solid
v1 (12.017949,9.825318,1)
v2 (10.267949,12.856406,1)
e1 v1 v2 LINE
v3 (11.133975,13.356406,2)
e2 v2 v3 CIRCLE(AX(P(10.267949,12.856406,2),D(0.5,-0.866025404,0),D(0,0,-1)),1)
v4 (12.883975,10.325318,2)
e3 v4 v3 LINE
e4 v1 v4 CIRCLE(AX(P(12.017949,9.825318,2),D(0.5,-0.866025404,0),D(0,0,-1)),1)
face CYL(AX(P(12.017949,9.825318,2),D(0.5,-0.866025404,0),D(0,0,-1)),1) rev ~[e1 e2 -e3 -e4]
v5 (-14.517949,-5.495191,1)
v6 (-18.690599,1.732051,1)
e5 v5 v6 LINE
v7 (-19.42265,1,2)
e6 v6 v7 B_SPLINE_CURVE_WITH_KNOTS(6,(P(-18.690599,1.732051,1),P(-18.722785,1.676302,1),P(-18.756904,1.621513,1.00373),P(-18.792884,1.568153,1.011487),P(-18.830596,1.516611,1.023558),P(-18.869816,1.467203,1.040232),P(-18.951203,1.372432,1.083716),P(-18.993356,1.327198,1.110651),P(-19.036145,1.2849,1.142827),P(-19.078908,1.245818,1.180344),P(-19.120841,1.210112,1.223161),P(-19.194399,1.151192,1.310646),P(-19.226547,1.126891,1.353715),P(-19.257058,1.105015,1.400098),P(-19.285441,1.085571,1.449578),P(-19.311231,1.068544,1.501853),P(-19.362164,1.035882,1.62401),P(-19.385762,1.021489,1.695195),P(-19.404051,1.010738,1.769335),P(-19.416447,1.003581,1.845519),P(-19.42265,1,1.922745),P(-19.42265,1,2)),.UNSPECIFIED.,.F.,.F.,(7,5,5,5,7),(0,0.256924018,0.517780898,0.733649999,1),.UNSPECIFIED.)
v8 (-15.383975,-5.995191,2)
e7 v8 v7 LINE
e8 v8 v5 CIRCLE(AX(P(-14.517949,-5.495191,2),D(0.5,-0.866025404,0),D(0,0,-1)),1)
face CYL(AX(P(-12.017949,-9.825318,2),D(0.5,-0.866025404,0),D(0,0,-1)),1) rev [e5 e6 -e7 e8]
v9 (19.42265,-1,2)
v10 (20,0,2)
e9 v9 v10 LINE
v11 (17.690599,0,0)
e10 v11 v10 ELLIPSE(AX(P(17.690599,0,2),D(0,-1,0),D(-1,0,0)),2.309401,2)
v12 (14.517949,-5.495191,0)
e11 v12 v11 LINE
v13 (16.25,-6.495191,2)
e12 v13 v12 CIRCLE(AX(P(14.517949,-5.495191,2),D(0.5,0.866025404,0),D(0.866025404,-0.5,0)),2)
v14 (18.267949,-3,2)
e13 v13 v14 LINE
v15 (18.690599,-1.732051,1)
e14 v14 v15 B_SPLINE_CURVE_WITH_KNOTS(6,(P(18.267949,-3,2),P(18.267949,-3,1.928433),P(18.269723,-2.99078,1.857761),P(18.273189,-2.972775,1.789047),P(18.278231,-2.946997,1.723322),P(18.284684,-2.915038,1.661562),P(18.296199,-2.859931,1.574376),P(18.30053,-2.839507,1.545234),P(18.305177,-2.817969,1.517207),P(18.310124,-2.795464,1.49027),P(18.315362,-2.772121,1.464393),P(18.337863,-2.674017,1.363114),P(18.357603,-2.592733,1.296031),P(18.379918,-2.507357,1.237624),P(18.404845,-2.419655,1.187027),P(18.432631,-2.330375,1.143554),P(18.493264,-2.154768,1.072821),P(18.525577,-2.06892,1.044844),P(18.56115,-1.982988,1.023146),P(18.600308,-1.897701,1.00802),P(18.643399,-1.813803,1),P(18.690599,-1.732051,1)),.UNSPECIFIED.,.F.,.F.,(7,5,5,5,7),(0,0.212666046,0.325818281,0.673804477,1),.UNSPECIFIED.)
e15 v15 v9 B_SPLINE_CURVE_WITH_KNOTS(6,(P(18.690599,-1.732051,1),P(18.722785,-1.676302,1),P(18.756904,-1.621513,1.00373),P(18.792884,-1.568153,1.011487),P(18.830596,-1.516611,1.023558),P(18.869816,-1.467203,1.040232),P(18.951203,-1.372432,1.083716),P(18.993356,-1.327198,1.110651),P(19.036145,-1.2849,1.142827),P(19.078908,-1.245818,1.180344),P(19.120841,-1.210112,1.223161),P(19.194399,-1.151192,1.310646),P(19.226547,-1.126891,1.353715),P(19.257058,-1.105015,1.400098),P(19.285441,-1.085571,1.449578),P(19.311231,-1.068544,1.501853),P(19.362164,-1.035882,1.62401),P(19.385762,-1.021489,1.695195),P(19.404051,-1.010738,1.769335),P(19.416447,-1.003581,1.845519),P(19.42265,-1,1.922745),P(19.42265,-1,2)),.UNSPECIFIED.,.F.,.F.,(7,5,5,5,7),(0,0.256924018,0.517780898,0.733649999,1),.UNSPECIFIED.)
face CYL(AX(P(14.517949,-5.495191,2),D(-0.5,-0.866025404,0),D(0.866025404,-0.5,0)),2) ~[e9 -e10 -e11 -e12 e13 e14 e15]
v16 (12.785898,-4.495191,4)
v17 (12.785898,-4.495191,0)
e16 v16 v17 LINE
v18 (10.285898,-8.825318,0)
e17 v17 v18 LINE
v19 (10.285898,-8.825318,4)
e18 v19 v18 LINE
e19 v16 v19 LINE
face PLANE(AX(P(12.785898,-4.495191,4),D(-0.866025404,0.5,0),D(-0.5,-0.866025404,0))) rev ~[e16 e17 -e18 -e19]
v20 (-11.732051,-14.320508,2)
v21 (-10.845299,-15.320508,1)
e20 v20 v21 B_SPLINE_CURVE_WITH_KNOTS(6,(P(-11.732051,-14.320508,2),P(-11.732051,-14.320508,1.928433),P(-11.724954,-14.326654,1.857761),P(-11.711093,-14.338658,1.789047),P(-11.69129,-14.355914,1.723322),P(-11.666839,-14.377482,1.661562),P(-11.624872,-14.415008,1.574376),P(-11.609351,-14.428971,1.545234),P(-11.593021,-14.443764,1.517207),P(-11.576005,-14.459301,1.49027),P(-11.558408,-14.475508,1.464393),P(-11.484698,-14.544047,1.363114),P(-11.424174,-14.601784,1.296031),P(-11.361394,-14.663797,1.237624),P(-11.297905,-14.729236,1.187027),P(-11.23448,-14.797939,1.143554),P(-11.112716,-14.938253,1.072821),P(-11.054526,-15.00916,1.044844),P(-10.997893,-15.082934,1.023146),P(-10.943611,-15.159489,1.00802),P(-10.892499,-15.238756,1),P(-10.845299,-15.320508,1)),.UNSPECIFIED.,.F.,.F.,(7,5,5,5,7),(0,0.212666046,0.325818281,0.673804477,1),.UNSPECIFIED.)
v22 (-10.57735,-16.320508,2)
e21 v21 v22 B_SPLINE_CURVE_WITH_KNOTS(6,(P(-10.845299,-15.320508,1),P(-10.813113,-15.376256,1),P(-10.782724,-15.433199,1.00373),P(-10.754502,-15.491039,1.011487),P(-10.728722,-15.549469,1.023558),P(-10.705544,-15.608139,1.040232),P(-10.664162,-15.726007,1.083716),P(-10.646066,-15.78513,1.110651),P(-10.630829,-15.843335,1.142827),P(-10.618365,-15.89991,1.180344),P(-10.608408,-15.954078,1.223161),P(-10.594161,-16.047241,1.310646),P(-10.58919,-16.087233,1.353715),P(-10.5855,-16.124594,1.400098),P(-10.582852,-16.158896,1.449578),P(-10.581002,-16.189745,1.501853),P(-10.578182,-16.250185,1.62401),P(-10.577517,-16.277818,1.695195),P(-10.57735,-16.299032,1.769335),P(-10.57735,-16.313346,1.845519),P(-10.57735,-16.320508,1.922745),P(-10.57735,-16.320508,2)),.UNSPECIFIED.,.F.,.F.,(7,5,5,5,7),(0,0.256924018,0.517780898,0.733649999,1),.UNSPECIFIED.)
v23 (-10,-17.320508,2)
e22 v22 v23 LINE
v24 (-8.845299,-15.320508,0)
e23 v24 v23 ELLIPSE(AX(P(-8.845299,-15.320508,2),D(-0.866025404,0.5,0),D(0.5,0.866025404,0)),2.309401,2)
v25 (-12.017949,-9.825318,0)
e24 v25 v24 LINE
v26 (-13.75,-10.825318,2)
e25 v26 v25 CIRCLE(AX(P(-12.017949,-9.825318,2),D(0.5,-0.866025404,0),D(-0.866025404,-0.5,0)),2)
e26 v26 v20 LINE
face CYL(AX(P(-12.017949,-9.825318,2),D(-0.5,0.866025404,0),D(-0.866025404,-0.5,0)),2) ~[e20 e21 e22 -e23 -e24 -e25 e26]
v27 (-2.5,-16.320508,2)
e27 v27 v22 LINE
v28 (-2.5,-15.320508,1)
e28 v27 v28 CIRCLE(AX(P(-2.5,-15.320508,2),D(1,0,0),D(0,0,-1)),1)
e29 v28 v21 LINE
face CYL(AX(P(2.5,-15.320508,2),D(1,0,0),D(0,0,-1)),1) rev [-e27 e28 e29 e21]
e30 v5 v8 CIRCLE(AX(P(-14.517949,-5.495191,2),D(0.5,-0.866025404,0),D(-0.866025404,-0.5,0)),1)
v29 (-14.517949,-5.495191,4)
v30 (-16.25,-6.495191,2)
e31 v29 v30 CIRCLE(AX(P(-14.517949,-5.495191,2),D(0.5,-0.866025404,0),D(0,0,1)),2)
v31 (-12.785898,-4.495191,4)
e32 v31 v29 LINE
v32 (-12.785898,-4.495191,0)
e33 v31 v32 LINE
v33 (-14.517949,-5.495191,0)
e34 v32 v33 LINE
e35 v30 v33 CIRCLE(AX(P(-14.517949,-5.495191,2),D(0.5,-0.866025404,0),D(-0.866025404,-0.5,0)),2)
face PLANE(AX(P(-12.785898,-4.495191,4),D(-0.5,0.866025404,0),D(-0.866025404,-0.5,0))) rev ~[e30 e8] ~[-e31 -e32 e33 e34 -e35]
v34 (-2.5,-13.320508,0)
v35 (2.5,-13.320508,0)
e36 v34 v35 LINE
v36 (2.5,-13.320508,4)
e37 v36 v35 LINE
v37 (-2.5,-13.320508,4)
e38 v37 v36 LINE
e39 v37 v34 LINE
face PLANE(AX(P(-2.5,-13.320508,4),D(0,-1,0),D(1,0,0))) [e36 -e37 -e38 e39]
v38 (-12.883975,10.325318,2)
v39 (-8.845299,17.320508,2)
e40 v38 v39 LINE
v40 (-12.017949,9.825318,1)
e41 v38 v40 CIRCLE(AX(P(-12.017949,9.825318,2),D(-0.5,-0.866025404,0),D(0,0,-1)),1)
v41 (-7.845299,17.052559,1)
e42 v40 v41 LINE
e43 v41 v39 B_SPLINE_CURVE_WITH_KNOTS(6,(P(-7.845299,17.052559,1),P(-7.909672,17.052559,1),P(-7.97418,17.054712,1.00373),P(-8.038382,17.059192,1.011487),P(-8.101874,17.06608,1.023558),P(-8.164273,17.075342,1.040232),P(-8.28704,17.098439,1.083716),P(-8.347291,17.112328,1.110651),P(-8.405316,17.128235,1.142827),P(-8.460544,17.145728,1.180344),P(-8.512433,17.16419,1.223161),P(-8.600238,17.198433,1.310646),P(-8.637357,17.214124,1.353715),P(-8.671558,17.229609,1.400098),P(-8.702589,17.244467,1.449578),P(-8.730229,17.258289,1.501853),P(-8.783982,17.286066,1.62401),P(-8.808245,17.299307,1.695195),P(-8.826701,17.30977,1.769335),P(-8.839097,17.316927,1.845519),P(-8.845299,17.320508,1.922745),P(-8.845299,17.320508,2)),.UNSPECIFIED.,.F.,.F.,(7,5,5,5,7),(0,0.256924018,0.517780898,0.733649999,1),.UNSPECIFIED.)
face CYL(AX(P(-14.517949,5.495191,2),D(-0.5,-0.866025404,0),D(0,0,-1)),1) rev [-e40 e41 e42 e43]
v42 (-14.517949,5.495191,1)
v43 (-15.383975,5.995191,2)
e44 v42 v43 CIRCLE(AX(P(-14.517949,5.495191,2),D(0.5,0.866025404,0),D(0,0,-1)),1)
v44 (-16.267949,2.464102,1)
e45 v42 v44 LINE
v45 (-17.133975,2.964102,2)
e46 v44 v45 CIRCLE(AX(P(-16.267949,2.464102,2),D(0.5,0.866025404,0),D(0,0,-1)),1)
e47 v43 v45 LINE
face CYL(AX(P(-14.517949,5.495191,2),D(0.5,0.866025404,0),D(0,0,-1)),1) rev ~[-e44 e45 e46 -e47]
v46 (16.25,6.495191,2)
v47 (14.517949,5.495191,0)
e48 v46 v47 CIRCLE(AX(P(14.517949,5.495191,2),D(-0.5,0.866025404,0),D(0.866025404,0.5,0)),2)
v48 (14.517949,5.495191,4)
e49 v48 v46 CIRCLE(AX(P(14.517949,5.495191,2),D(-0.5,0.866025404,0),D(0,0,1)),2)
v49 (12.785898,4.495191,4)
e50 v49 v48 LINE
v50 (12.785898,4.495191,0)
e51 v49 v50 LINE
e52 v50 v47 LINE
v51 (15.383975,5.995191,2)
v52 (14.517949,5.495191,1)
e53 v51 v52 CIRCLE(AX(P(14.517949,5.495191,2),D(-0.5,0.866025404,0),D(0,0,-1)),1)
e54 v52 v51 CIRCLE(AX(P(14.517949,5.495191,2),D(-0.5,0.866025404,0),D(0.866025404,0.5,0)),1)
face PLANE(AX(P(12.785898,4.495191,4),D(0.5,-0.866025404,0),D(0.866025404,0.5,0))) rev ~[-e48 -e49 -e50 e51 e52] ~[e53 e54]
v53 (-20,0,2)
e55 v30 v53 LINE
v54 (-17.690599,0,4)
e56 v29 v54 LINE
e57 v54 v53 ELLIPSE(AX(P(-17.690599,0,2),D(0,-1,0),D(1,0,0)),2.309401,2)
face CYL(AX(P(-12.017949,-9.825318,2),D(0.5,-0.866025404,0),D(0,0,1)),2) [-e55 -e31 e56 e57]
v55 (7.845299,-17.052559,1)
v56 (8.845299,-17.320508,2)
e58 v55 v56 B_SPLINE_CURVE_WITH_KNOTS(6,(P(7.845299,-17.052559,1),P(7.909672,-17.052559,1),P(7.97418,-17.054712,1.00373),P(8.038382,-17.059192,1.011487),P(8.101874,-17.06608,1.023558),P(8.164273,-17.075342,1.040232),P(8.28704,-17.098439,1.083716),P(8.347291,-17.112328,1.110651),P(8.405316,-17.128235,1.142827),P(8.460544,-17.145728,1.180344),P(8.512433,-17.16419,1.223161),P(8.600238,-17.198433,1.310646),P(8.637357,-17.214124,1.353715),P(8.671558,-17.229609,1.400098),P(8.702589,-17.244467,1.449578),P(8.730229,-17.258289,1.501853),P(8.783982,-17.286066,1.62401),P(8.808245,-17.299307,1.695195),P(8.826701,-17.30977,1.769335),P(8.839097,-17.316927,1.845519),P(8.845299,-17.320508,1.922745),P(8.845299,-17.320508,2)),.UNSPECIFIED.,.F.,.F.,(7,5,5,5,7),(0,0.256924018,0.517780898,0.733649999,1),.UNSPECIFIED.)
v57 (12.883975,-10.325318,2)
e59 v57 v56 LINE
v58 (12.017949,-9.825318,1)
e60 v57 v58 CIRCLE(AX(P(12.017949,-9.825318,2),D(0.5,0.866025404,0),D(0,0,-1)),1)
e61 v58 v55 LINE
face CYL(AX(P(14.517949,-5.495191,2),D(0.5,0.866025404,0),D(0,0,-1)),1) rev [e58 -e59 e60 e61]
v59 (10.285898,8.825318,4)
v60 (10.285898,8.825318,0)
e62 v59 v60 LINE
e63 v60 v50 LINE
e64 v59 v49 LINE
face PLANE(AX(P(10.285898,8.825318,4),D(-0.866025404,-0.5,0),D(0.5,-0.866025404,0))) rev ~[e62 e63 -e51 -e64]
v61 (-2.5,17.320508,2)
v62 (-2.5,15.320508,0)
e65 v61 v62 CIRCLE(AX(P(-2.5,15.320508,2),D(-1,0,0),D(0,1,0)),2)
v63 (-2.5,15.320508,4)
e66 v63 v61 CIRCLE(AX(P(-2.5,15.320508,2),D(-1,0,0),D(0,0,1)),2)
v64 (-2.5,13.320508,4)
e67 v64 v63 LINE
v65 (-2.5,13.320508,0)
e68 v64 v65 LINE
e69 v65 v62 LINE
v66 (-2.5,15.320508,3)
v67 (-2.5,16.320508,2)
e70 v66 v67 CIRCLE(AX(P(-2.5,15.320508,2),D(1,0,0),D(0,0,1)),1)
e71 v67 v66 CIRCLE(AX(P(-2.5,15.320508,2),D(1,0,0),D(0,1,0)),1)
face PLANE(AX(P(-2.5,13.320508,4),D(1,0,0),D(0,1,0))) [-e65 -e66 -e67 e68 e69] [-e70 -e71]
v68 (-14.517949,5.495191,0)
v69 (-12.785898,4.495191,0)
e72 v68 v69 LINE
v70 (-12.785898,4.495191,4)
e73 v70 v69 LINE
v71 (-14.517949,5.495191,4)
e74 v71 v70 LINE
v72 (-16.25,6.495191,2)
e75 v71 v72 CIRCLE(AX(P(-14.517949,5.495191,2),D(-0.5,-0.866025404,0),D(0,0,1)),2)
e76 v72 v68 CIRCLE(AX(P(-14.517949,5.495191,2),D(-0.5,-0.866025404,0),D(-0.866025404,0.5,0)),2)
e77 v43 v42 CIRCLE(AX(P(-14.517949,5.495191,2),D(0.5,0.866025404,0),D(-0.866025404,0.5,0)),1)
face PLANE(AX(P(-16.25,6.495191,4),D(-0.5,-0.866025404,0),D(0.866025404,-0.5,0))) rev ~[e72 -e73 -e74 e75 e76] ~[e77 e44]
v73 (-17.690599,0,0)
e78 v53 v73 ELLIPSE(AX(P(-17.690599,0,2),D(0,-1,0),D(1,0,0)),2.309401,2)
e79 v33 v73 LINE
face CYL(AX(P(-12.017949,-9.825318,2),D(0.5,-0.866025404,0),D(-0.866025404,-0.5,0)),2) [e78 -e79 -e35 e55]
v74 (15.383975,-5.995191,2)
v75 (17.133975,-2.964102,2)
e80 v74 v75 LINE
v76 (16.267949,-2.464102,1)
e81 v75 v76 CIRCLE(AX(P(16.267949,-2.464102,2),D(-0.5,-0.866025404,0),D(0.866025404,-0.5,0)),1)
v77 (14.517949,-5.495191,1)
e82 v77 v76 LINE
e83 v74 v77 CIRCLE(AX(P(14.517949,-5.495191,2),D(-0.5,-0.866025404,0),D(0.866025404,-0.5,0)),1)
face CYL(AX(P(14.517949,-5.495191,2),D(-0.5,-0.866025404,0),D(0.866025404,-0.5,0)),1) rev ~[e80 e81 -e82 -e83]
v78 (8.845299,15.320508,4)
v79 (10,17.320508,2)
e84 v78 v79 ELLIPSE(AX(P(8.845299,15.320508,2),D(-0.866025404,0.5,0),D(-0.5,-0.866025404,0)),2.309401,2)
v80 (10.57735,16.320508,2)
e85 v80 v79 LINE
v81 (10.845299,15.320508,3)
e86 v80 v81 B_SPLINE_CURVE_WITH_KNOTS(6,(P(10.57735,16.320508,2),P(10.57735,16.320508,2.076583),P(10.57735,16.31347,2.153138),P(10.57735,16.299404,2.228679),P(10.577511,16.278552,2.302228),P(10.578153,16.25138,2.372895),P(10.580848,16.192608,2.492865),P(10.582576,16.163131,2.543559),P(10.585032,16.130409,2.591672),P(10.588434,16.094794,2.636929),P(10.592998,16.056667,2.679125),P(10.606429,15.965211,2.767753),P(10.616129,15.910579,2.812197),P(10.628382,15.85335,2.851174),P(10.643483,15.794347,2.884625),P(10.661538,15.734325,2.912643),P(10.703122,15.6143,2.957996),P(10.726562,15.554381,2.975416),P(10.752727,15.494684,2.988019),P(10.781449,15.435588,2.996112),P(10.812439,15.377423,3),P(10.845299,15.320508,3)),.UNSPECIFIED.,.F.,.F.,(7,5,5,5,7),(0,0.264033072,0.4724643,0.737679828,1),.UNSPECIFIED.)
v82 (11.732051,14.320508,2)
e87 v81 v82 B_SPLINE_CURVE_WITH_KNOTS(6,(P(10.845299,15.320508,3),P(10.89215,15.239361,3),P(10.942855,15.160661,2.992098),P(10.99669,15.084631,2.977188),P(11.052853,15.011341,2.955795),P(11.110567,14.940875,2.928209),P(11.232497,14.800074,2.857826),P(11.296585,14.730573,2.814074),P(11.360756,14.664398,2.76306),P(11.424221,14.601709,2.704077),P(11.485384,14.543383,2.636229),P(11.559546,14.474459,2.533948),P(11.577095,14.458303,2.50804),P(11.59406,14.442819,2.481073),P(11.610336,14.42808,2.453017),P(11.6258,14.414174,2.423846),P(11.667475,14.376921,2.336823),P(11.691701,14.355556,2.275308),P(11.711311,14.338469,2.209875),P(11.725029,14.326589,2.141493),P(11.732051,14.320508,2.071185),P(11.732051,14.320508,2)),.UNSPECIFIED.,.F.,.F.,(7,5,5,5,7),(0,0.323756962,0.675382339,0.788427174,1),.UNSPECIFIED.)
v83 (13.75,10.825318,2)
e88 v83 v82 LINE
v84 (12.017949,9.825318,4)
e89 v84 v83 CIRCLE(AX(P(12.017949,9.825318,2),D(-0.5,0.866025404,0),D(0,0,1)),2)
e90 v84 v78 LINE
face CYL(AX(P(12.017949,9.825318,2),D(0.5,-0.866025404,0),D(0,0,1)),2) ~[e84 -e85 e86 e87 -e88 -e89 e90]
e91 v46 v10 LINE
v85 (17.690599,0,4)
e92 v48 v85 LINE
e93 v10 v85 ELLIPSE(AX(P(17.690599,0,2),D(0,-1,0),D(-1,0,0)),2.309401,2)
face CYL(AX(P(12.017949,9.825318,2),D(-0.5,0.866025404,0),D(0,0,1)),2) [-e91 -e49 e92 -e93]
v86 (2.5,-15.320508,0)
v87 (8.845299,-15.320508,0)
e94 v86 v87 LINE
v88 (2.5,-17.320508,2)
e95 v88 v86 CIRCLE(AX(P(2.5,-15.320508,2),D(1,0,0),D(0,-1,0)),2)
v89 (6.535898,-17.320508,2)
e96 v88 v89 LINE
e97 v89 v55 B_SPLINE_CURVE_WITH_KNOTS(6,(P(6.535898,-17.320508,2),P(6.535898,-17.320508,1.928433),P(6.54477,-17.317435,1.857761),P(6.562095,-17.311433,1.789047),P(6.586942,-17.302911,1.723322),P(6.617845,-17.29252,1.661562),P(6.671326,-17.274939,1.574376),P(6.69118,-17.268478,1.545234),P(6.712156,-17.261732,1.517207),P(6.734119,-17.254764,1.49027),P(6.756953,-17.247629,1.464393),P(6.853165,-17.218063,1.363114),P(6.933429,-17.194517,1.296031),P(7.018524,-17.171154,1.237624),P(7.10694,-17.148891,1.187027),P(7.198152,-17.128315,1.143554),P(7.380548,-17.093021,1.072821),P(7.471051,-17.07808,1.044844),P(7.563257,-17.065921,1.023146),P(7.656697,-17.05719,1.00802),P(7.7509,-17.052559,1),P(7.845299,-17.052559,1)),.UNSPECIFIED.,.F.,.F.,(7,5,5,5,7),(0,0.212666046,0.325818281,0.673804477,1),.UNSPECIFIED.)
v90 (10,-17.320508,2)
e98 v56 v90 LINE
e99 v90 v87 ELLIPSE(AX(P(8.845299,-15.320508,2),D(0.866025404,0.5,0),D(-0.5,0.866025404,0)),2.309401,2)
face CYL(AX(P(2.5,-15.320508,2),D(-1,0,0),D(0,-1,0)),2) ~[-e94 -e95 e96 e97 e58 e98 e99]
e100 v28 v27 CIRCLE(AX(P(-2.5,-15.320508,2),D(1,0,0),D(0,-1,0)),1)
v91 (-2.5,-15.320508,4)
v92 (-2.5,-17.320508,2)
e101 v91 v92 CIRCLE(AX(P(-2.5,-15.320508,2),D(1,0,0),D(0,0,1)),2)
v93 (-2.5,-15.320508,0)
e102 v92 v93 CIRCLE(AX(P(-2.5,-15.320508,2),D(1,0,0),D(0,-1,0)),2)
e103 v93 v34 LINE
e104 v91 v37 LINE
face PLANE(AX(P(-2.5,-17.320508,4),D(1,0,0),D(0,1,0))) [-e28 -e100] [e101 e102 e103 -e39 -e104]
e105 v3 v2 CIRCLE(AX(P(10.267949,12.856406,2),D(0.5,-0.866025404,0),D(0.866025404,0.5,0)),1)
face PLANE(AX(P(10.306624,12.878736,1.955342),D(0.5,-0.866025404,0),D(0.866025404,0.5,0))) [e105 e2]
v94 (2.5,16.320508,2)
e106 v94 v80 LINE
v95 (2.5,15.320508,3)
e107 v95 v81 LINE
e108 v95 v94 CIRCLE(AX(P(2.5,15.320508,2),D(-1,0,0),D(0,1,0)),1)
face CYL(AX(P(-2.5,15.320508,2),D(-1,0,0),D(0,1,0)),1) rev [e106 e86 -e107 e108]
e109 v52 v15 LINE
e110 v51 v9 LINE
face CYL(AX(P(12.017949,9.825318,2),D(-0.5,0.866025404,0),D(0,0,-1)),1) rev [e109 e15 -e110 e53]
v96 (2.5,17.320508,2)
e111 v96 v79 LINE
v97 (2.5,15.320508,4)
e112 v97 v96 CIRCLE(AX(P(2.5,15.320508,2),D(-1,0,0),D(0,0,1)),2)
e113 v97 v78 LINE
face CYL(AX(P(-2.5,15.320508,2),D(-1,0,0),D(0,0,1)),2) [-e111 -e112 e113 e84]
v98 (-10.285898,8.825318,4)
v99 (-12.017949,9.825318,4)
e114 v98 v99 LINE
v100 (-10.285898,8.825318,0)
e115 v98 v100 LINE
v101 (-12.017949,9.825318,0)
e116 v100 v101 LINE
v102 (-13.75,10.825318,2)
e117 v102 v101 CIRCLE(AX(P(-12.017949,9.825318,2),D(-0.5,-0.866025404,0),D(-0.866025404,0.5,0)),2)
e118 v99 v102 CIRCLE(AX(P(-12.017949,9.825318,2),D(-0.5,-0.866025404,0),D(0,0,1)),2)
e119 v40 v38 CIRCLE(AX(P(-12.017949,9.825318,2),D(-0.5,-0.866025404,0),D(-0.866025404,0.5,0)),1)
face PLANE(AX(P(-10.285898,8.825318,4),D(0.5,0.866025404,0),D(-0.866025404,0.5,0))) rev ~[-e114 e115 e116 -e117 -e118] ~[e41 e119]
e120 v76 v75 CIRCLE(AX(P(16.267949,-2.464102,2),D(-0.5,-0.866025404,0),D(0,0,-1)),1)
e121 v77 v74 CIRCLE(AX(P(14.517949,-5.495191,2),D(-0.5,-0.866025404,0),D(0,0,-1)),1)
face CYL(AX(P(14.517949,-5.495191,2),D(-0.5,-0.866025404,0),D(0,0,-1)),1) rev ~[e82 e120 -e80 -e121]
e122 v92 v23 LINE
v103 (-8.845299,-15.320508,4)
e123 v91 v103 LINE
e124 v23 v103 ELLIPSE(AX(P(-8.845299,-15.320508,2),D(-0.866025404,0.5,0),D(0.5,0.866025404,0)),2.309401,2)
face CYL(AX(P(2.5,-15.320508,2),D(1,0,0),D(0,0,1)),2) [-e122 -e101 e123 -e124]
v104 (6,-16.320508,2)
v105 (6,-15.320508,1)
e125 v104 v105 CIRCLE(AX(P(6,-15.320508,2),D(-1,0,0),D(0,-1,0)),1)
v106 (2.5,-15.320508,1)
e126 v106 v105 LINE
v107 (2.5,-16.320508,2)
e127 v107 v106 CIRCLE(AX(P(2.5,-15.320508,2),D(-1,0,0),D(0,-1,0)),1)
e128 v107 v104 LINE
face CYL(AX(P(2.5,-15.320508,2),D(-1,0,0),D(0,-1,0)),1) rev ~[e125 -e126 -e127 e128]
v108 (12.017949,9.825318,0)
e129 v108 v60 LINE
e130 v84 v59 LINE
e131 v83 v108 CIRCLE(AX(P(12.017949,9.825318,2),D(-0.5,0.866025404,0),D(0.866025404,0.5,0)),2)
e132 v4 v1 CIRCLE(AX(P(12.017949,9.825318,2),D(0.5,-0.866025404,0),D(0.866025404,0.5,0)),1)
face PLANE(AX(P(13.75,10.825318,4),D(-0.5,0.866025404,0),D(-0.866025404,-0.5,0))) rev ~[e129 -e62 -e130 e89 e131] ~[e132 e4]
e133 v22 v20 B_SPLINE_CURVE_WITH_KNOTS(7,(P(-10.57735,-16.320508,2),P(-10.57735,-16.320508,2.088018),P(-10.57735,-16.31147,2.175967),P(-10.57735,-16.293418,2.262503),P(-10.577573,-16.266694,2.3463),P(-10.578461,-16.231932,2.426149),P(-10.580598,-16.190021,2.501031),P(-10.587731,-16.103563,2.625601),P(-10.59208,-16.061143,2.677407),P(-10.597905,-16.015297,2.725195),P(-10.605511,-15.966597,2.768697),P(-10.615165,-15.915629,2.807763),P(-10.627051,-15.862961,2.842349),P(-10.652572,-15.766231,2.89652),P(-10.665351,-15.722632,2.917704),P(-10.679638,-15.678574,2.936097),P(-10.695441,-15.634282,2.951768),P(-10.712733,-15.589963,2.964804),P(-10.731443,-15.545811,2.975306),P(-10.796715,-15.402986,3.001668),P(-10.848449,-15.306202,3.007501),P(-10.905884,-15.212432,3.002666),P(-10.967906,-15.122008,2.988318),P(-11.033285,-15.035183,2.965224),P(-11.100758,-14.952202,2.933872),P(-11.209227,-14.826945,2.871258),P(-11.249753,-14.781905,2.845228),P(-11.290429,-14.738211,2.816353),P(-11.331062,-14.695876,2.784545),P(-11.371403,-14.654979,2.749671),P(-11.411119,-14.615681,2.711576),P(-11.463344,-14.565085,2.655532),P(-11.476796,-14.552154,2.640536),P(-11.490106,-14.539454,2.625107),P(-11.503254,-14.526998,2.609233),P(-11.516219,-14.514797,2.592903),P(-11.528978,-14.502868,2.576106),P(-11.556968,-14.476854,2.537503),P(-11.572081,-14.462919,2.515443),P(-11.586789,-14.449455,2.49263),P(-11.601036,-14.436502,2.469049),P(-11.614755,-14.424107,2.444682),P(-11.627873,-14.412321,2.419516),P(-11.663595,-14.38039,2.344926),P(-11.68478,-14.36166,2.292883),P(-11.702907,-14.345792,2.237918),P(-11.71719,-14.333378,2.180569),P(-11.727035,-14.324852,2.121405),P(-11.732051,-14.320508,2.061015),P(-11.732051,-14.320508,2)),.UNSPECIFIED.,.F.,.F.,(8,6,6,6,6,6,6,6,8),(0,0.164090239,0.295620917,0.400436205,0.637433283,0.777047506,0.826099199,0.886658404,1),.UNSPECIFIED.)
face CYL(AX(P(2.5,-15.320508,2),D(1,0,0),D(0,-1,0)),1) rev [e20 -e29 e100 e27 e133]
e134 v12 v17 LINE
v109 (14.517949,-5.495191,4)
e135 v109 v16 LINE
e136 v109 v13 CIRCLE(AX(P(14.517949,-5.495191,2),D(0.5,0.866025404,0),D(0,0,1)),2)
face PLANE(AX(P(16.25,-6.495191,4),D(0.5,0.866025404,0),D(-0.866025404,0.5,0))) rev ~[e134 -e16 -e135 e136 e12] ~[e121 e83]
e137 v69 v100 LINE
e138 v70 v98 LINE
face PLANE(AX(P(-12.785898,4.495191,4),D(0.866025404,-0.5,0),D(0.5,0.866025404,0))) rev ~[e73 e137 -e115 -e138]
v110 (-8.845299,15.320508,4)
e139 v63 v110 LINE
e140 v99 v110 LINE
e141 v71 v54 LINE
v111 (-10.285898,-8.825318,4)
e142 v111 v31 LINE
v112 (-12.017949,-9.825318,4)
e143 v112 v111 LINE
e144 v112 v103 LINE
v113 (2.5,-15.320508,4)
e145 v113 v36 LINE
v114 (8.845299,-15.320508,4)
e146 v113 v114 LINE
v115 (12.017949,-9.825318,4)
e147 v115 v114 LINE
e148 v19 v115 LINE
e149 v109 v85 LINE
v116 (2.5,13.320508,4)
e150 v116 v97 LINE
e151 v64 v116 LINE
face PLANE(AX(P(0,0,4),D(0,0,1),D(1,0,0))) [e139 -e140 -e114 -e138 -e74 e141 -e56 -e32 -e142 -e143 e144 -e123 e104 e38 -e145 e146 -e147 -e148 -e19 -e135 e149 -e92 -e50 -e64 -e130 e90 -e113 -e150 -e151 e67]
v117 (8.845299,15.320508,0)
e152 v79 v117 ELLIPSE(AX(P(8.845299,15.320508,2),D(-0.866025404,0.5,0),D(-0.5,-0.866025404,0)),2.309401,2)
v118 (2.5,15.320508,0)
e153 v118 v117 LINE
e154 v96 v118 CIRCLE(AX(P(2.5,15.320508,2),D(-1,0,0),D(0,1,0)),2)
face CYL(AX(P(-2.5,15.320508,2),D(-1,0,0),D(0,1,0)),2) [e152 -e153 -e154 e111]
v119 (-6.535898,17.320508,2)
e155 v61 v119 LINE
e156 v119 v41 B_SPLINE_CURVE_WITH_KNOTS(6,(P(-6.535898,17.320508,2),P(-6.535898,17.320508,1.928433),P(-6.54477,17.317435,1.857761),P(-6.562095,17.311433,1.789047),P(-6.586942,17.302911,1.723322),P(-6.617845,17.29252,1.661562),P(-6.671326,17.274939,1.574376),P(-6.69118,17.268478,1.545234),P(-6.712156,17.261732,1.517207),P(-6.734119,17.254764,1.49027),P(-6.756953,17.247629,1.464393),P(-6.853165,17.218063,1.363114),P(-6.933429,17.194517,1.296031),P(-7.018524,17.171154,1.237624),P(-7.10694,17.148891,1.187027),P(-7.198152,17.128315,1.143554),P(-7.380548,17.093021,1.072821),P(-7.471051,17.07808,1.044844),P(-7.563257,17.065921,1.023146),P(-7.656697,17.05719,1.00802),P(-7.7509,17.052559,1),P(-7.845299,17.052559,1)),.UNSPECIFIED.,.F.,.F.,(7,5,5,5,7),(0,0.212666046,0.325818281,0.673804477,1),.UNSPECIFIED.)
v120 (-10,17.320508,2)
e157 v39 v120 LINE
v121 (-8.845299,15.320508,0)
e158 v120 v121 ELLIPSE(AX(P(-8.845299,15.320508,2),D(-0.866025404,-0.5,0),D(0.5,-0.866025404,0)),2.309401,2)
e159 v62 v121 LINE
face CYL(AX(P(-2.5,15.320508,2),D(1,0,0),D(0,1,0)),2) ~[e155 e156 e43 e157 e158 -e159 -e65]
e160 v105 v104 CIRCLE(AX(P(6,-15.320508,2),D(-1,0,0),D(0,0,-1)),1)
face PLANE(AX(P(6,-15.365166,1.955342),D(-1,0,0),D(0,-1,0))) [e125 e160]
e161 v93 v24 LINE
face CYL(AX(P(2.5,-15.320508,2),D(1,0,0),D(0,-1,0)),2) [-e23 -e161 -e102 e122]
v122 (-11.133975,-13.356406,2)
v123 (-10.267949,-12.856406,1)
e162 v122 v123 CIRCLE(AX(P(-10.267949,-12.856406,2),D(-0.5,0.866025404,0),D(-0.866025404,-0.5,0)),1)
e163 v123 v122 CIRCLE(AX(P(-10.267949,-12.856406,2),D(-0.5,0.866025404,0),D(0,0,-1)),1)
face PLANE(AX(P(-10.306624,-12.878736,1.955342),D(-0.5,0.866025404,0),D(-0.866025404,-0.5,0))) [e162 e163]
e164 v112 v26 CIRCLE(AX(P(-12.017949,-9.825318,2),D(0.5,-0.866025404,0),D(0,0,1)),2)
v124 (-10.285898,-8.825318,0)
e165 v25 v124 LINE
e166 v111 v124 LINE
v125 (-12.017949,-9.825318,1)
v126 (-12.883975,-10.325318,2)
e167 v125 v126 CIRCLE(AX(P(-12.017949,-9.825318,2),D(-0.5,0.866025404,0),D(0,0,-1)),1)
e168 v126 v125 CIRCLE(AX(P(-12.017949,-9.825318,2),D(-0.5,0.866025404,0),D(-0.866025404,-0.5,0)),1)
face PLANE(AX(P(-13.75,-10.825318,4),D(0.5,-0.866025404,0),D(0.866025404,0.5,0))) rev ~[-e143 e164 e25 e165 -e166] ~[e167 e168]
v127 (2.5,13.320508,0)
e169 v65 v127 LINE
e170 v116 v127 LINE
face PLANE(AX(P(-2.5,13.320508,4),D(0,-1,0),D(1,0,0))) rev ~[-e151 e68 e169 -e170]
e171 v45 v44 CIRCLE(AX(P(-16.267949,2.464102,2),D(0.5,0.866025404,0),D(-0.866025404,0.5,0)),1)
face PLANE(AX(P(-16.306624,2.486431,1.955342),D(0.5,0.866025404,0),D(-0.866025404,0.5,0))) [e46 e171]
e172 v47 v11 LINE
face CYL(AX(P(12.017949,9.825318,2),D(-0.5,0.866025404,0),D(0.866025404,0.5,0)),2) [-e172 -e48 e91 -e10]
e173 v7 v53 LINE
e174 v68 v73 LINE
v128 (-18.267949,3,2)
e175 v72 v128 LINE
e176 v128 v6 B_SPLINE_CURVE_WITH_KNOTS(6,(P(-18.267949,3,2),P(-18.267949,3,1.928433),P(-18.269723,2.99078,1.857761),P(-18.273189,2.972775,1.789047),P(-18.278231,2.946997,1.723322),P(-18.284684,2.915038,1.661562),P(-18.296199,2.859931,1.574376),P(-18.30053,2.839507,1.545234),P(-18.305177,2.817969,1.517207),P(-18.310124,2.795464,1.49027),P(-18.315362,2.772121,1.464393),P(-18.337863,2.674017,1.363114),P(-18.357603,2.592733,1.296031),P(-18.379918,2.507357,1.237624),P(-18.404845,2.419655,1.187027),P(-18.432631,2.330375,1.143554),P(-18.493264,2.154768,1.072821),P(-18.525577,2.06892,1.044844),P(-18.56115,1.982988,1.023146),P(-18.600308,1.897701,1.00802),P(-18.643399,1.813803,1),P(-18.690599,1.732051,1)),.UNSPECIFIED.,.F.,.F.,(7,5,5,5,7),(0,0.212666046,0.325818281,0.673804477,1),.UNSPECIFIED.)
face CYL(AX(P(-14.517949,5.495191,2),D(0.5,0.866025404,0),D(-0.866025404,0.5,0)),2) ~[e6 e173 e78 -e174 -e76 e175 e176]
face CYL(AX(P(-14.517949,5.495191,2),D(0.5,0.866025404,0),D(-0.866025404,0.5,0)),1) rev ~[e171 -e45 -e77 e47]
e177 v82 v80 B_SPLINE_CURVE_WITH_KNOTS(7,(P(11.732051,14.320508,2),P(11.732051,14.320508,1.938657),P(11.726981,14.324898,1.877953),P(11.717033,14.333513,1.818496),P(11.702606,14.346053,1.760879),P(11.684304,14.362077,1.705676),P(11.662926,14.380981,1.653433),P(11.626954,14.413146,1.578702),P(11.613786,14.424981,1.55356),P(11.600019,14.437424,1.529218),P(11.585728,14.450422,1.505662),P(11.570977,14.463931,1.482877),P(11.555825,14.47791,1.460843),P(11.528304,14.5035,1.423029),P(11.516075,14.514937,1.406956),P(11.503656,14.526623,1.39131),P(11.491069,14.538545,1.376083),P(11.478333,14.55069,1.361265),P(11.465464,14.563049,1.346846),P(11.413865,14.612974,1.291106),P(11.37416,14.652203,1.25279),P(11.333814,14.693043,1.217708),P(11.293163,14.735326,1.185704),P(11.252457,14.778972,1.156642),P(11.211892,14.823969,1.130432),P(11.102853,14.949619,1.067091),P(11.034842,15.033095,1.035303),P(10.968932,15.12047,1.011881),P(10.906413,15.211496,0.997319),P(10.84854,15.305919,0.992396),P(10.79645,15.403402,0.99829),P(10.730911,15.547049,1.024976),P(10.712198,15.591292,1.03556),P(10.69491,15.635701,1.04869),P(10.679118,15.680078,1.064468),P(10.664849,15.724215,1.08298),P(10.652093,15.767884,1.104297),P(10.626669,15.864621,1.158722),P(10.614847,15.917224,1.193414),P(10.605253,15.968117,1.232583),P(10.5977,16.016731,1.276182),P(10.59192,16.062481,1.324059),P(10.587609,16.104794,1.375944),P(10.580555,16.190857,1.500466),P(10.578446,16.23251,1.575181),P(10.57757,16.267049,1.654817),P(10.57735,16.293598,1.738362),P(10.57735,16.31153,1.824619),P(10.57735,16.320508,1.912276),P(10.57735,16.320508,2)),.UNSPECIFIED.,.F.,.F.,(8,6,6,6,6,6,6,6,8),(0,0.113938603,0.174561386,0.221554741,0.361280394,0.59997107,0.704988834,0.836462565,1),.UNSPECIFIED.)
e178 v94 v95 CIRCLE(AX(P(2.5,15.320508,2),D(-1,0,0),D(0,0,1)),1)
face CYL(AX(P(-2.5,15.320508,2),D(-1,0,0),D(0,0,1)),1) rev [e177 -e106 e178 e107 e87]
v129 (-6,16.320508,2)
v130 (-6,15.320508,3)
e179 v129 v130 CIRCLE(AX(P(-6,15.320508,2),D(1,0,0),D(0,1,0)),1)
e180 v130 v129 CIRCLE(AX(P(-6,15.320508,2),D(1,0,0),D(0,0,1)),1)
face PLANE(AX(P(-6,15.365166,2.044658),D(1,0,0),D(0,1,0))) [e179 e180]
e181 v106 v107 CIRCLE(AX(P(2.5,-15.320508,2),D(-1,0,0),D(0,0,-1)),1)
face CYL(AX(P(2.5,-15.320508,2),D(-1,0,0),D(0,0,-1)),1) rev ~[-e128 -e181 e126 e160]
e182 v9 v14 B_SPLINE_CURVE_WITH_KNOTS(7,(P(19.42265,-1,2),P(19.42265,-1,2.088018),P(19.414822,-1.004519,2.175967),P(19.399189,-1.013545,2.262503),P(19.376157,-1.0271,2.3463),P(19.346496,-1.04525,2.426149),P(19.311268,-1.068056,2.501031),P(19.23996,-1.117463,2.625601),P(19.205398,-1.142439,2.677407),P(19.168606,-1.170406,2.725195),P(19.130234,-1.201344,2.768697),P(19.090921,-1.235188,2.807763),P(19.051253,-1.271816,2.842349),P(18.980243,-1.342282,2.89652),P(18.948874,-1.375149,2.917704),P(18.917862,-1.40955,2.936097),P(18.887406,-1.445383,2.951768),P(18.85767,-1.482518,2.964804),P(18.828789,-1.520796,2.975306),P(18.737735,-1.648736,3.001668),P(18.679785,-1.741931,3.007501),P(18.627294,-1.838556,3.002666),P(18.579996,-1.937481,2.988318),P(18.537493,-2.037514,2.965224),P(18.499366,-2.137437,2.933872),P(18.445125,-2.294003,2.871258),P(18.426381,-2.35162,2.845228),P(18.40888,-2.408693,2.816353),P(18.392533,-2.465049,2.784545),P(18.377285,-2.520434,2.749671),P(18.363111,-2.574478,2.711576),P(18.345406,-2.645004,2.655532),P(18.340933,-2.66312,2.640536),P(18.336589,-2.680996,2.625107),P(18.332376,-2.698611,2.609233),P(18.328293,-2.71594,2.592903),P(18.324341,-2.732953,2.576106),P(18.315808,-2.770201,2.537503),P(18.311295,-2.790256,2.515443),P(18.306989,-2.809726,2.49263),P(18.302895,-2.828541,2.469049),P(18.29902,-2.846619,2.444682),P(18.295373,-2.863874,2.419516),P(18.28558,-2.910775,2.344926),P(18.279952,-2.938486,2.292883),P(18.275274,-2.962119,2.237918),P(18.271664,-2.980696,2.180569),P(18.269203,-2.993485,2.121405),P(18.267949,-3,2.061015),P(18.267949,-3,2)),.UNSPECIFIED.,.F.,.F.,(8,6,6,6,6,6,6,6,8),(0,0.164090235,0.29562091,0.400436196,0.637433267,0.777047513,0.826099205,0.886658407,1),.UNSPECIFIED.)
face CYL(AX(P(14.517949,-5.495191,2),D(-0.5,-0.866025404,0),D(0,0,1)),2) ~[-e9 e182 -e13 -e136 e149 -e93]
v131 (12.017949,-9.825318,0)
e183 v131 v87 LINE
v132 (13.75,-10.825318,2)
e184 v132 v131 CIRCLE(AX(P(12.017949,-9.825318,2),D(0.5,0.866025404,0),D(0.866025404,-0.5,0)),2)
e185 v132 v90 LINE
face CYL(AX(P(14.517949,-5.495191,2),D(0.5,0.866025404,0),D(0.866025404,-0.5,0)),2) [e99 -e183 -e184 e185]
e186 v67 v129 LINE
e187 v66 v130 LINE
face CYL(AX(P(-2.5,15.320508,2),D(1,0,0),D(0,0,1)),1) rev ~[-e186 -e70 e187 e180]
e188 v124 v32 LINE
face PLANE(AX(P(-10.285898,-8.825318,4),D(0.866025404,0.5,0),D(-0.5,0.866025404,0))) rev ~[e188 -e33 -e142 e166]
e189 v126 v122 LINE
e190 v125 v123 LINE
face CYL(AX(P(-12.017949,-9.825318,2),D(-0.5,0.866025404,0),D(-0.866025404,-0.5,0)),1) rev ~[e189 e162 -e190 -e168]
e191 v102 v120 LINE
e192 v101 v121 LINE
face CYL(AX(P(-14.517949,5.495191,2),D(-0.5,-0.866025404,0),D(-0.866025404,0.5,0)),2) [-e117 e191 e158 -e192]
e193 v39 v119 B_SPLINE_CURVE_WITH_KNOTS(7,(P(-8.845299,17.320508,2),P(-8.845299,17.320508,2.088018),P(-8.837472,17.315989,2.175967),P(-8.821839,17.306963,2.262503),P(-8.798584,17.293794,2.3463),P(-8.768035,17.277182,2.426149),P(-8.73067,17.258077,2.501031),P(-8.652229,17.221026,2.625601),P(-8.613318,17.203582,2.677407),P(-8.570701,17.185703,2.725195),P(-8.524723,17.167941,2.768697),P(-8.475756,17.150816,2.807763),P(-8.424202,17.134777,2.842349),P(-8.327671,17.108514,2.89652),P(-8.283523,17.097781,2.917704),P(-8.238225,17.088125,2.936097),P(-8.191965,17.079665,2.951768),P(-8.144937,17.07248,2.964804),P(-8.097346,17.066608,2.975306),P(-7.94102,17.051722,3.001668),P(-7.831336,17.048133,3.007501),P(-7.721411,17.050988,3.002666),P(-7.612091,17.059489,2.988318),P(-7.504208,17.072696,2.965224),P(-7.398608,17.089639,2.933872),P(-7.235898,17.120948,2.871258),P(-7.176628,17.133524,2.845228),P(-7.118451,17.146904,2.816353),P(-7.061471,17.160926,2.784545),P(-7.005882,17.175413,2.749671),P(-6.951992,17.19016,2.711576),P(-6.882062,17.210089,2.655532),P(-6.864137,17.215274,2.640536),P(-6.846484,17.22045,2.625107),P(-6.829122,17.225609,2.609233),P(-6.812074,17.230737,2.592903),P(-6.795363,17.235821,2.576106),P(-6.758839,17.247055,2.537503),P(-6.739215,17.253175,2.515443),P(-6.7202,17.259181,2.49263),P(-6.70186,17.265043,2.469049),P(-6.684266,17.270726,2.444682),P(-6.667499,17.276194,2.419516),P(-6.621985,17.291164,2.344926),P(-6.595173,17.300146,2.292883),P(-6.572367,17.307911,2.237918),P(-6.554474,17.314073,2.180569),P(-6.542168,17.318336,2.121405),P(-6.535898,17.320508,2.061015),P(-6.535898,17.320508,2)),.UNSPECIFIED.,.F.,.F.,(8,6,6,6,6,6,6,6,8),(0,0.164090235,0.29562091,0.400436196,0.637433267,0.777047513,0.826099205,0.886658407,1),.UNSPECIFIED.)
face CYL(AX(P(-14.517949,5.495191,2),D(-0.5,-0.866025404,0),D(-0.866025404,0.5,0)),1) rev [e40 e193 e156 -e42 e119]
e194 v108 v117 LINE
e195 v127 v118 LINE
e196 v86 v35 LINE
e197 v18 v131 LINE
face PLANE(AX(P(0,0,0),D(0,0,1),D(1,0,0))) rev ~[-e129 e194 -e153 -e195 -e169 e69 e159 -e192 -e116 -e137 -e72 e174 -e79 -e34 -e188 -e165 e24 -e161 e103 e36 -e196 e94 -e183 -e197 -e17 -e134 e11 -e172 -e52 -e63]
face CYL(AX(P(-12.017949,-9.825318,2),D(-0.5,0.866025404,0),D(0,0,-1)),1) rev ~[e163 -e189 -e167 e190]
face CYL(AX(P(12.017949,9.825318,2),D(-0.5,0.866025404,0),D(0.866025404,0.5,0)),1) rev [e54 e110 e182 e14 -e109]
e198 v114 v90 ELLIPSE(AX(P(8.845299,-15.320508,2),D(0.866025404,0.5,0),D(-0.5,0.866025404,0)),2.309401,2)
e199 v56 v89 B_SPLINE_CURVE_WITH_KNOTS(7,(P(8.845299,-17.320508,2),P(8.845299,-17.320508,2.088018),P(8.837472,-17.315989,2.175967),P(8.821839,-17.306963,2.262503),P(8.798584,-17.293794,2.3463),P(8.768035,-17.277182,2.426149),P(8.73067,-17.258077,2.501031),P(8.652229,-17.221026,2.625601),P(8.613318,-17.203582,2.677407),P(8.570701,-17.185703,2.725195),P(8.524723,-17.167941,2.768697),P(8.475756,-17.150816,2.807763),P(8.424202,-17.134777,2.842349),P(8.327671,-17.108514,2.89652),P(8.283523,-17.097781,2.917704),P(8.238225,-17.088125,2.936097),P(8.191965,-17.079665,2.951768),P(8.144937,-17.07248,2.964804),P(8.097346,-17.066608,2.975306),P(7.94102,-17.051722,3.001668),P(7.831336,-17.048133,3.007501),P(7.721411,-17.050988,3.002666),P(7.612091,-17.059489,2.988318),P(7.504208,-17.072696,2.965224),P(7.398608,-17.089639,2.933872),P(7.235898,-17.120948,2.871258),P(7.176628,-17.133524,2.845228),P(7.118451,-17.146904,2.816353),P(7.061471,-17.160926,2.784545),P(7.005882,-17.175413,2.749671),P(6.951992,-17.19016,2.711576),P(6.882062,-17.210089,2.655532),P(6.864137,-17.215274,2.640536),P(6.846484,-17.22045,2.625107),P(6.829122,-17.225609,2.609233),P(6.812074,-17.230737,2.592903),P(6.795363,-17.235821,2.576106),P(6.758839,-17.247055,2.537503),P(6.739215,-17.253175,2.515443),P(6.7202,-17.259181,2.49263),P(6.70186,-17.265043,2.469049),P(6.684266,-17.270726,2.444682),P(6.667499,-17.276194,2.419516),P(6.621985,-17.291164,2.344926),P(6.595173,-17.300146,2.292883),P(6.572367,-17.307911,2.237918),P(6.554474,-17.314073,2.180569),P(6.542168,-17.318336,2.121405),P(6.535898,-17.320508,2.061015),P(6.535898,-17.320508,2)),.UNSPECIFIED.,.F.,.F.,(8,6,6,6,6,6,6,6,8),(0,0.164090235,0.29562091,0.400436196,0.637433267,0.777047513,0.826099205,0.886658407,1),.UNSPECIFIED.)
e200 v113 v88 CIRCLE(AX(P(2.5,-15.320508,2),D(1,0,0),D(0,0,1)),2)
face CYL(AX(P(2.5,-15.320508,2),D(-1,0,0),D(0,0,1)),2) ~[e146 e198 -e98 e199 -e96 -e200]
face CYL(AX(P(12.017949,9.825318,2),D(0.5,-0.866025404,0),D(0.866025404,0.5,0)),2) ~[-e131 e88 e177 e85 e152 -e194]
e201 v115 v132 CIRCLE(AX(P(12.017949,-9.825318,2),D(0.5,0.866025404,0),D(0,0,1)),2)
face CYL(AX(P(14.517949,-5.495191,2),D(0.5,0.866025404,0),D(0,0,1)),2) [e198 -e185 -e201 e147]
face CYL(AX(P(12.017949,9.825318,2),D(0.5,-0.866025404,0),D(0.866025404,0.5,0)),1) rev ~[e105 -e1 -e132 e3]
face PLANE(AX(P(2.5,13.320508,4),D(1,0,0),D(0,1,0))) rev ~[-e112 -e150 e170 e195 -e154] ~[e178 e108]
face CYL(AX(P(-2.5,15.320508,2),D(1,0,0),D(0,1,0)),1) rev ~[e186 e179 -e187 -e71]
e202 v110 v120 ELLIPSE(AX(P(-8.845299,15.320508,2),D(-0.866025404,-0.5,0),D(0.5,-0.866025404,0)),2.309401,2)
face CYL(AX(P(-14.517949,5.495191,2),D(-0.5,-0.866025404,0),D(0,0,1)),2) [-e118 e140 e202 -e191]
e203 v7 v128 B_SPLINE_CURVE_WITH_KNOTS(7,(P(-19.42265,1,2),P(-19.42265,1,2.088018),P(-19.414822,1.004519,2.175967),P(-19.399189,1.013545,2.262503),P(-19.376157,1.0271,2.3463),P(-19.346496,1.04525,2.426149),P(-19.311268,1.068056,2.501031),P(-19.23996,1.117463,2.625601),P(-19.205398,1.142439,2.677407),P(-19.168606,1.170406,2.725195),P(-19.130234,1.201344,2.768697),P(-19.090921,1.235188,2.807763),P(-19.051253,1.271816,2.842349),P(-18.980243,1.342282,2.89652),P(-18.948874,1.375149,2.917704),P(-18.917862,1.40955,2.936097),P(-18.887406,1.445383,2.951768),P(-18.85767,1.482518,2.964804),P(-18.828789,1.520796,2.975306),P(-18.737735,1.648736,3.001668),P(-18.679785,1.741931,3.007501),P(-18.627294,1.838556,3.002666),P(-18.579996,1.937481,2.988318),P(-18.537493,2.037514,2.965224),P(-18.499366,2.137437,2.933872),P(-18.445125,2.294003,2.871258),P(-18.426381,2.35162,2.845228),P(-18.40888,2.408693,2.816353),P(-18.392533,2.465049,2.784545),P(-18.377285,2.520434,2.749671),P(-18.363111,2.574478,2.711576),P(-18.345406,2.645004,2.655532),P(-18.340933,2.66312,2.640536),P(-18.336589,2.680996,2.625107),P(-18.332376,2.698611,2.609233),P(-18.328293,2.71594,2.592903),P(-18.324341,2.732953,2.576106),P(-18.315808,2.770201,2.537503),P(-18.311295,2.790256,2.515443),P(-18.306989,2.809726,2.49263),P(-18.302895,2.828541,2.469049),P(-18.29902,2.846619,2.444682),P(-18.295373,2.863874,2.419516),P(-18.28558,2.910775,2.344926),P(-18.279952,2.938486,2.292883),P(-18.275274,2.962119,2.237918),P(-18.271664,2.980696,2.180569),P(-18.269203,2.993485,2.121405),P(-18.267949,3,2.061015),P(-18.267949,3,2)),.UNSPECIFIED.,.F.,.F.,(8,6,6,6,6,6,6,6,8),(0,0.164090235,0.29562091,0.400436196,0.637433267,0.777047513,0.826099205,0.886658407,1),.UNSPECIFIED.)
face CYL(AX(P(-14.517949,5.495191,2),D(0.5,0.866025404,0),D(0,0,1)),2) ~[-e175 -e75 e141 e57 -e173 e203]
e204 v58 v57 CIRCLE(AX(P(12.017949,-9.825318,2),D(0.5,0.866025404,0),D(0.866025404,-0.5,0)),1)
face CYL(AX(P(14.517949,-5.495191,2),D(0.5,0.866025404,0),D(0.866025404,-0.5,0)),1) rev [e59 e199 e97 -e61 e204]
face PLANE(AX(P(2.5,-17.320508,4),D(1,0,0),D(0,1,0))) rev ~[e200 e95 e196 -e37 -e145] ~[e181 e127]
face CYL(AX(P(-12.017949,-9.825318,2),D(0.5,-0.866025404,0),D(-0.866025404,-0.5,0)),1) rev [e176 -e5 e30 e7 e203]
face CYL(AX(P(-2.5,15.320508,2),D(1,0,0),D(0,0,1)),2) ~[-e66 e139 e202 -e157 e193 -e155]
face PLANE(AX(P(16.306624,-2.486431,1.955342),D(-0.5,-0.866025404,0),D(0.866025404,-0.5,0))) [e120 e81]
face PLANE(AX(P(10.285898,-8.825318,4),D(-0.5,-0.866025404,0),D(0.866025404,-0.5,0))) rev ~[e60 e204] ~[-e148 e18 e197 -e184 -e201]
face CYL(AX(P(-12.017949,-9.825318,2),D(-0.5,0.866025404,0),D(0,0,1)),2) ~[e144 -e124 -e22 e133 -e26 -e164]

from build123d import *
from build123d import SkipClean  # not in build123d's __all__

# Parameters (mm, degrees)
F1_DEPTH       = 4
F2_W           = 5
F2_H           = 4
F3_DEPTH       = 25
F5_DEPTH       = 3.5
F5_DEPTH_BACK  = 25
F7_DEPTH       = 25
F7_DEPTH_BACK  = 3.5
F9_DEPTH       = 3.5
F9_DEPTH_BACK  = 25
F11_DEPTH      = 25
F11_DEPTH_BACK = 3.5
F13_DEPTH      = 25
F13_DEPTH_BACK = 3.5
F15_DEPTH      = 25
F15_DEPTH_BACK = 3.5
F16_R          = 0.99999
F18_DEPTH      = 25
F18_DEPTH_BACK = 25
F19_DEPTH      = 25
F19_DEPTH_BACK = 25
F20_DEPTH      = 25
F20_DEPTH_BACK = 25
F21_DEPTH      = 25
F21_DEPTH_BACK = 25
F22_DEPTH      = 25
F22_DEPTH_BACK = 25
F23_DEPTH      = 25
F23_DEPTH_BACK = 25


# Not quite as in the source:
# - a fillet or chamfer is up to 0.001 mm smaller than in the source, because OpenCascade refuses the exact size
# - after a boolean that leaves OpenCascade's solid faulty, fix() repairs it


with BuildPart() as f1:
    # F0 (on Top) → F1 (new body)
    with BuildSketch(Plane.XY):
        Polygon((-20, 0), (-10, -17.3205080757), (10, -17.3205080757), (20, 0), (10, 17.3205080757), (-10, 17.3205080757), align=None)
    extrude(amount=F1_DEPTH)

    # F2 (on face) → F3 (cut)
    with BuildSketch(Plane.XY.offset(4)):
        with Locations((0, 15.3205080757)):
            Rectangle(F2_W, F2_H)
        Polygon((12.7858983849, 4.4951905284), (16.25, 6.4951905284), (13.75, 10.8253175473), (10.2858983849, 8.8253175473), align=None)
        Polygon((10.2858983849, -8.8253175473), (13.75, -10.8253175473), (16.25, -6.4951905284), (12.7858983849, -4.4951905284), align=None)
        with Locations((0, -15.3205080757)):
            Rectangle(F2_W, F2_H)
        Polygon((-16.25, -6.4951905284), (-13.75, -10.8253175473), (-10.2858983849, -8.8253175473), (-12.7858983849, -4.4951905284), align=None)
        Polygon((-13.75, 10.8253175473), (-16.25, 6.4951905284), (-12.7858983849, 4.4951905284), (-10.2858983849, 8.8253175473), align=None)
    extrude(amount=-F3_DEPTH, mode=Mode.SUBTRACT)

    # F4 (on face) → F5 (cut, two sides)
    with BuildSketch(Plane(origin=(-1.25, 2.1650635095, 0), x_dir=(0.8660254038, 0.5, 0), z_dir=(0.5, -0.8660254038, 0))) as f5_sk:
        with BuildLine():
            ThreePointArc((16.3205080757, 2), (14.6134012945, 2.7071067812), (15.3205080757, 1))
            ThreePointArc((15.3205080757, 1), (16.0276148569, 1.2928932188), (16.3205080757, 2))
        make_face()
    extrude(amount=-F5_DEPTH, mode=Mode.SUBTRACT)
    extrude(f5_sk.sketch, amount=F5_DEPTH_BACK, mode=Mode.SUBTRACT)

    # F6 (on face) → F7 (cut, two sides)
    with BuildSketch(Plane(origin=(1.25, 2.1650635095, 0), x_dir=(0.8660254038, -0.5, 0), z_dir=(-0.5, -0.8660254038, 0))) as f7_sk:
        with BuildLine():
            ThreePointArc((16.3205080757, 2), (14.6134012945, 2.7071067812), (15.3205080757, 1))
            ThreePointArc((15.3205080757, 1), (16.0276148569, 1.2928932188), (16.3205080757, 2))
        make_face()
    extrude(amount=F7_DEPTH, mode=Mode.SUBTRACT)
    extrude(f7_sk.sketch, amount=-F7_DEPTH_BACK, mode=Mode.SUBTRACT)

    # F8 (on face) → F9 (cut, two sides)
    with BuildSketch(Plane(origin=(2.5, 0, 0), x_dir=(0, -1, 0), z_dir=(-1, 0, 0))) as f9_sk:
        with BuildLine():
            ThreePointArc((16.3205080757, 2), (14.6134012945, 2.7071067812), (15.3205080757, 1))
            ThreePointArc((15.3205080757, 1), (16.0276148569, 1.2928932188), (16.3205080757, 2))
        make_face()
    extrude(amount=-F9_DEPTH, mode=Mode.SUBTRACT)
    extrude(f9_sk.sketch, amount=F9_DEPTH_BACK, mode=Mode.SUBTRACT)

    # F10 (on face) → F11 (cut, two sides)
    with BuildSketch(Plane(origin=(1.25, -2.1650635095, 0), x_dir=(-0.8660254038, -0.5, 0), z_dir=(-0.5, 0.8660254038, 0))) as f11_sk:
        with BuildLine():
            ThreePointArc((16.3205080757, 2), (14.6134012945, 2.7071067812), (15.3205080757, 1))
            ThreePointArc((15.3205080757, 1), (16.0276148569, 1.2928932188), (16.3205080757, 2))
        make_face()
    extrude(amount=F11_DEPTH, mode=Mode.SUBTRACT)
    extrude(f11_sk.sketch, amount=-F11_DEPTH_BACK, mode=Mode.SUBTRACT)

    # F12 (on face) → F13 (cut, two sides)
    with BuildSketch(Plane(origin=(-1.25, -2.1650635095, 0), x_dir=(-0.8660254038, 0.5, 0), z_dir=(0.5, 0.8660254038, 0))) as f13_sk:
        with BuildLine():
            ThreePointArc((16.3205080757, 2), (14.6134012945, 2.7071067812), (15.3205080757, 1))
            ThreePointArc((15.3205080757, 1), (16.0276148569, 1.2928932188), (16.3205080757, 2))
        make_face()
    extrude(amount=F13_DEPTH, mode=Mode.SUBTRACT)
    extrude(f13_sk.sketch, amount=-F13_DEPTH_BACK, mode=Mode.SUBTRACT)

    # F14 (on face) → F15 (cut, two sides)
    with BuildSketch(Plane.YZ.offset(-2.5)) as f15_sk:
        with BuildLine():
            ThreePointArc((16.3205080757, 2), (16.0276148569, 2.7071067812), (15.3205080757, 3))
            ThreePointArc((15.3205080757, 3), (14.6134012945, 1.2928932188), (16.3205080757, 2))
        make_face()
    extrude(amount=F15_DEPTH, mode=Mode.SUBTRACT)
    extrude(f15_sk.sketch, amount=-F15_DEPTH_BACK, mode=Mode.SUBTRACT)

    # F16 (radius 1 in the source; OpenCascade refuses exactly that, so slightly less here)
    f16_edges = [f1.edges().sort_by_distance(p)[0] for p in [
        (-6.25, -17.320508, 4),
        (-6.25, -17.320508, 0),
        (6.25, -17.320508, 4),
        (6.25, -17.320508, 0),
        (11.875, -14.072913, 4),
        (11.875, -14.072913, 0),
        (18.125, -3.247595, 4),
        (18.125, -3.247595, 0),
        (18.125, 3.247595, 4),
        (18.125, 3.247595, 0),
        (11.875, 14.072913, 4),
        (11.875, 14.072913, 0),
        (6.25, 17.320508, 4),
        (6.25, 17.320508, 0),
        (-6.25, 17.320508, 0),
        (-6.25, 17.320508, 4),
        (-11.875, 14.072913, 4),
        (-11.875, 14.072913, 0),
        (-18.125, 3.247595, 4),
        (-18.125, 3.247595, 0),
        (-18.125, -3.247595, 0),
        (-18.125, -3.247595, 4),
        (-11.875, -14.072913, 0),
        (-11.875, -14.072913, 4),
    ]]
    fillet(f16_edges, radius=F16_R)

    # F17 (on face) → F18 (cut, two sides)
    with BuildSketch(Plane(origin=(1.25, -2.1650635095, 0), x_dir=(-0.8660254038, -0.5, 0), z_dir=(-0.5, 0.8660254038, 0))) as f18_sk:
        with BuildLine():
            ThreePointArc((15.3205080757, 4), (16.7347216381, 3.4142135624), (17.3205080757, 2))
            Line((17.3205080757, 2), (17.3205080757, 3.00001))
            ThreePointArc((17.3205080757, 3.00001), (17.0276177858, 3.7071097101), (16.3205180757, 4))
            Line((16.3205180757, 4), (15.3205080757, 4))
        make_face()
        with BuildLine():
            Line((17.3205080757, 0.99999), (17.3205080757, 2))
            ThreePointArc((17.3205080757, 2), (16.7347216381, 0.5857864376), (15.3205080757, 0))
            Line((15.3205080757, 0), (16.3205180757, 0))
            ThreePointArc((16.3205180757, 0), (17.0276177858, 0.2928902899), (17.3205080757, 0.99999))
        make_face()
    extrude(amount=-F18_DEPTH, mode=Mode.SUBTRACT)
    extrude(f18_sk.sketch, amount=F18_DEPTH_BACK, mode=Mode.SUBTRACT)

    # F12 (on face) → F19 (cut, two sides)
    with BuildSketch(Plane(origin=(-1.25, -2.1650635095, 0), x_dir=(-0.8660254038, 0.5, 0), z_dir=(0.5, 0.8660254038, 0))) as f19_sk:
        with BuildLine():
            ThreePointArc((15.3205080757, 4), (16.7347216381, 3.4142135624), (17.3205080757, 2))
            Line((17.3205080757, 2), (17.3205080757, 4))
            Line((17.3205080757, 4), (15.3205080757, 4))
        make_face()
        with BuildLine():
            Line((15.3205080757, 0), (17.3205080757, 0))
            Line((17.3205080757, 0), (17.3205080757, 2))
            ThreePointArc((17.3205080757, 2), (16.7347216381, 0.5857864376), (15.3205080757, 0))
        make_face()
    extrude(amount=-F19_DEPTH, mode=Mode.SUBTRACT)
    extrude(f19_sk.sketch, amount=F19_DEPTH_BACK, mode=Mode.SUBTRACT)

    # F14 (on face) → F20 (cut, two sides)
    with BuildSketch(Plane.YZ.offset(-2.5)) as f20_sk:
        with BuildLine():
            Line((17.3205080757, 2), (17.3205080757, 4))
            Line((17.3205080757, 4), (15.3205080757, 4))
            ThreePointArc((15.3205080757, 4), (16.7347216381, 3.4142135624), (17.3205080757, 2))
        make_face()
        with BuildLine():
            Line((17.3205080757, 0), (17.3205080757, 2))
            ThreePointArc((17.3205080757, 2), (16.7347216381, 0.5857864376), (15.3205080757, 0))
            Line((15.3205080757, 0), (17.3205080757, 0))
        make_face()
    extrude(amount=-F20_DEPTH, mode=Mode.SUBTRACT)
    extrude(f20_sk.sketch, amount=F20_DEPTH_BACK, mode=Mode.SUBTRACT)

    # F6 (on face) → F21 (cut, two sides)
    with BuildSketch(Plane(origin=(1.25, 2.1650635095, 0), x_dir=(0.8660254038, -0.5, 0), z_dir=(-0.5, -0.8660254038, 0))) as f21_sk:
        with BuildLine():
            ThreePointArc((15.3205080757, 4), (16.7347216381, 3.4142135624), (17.3205080757, 2))
            Line((17.3205080757, 2), (17.3205080757, 4))
            Line((17.3205080757, 4), (15.3205080757, 4))
        make_face()
        with BuildLine():
            Line((16.3205080757, 0), (17.3205080757, 0))
            Line((17.3205080757, 0), (17.3205080757, 2))
            ThreePointArc((17.3205080757, 2), (16.7347216381, 0.5857864376), (15.3205080757, 0))
            Line((15.3205080757, 0), (16.3205080757, 0))
        make_face()
    with SkipClean():  # cleaning this boolean's faces spoils the solid; the shape is the same uncleaned
        extrude(amount=-F21_DEPTH, mode=Mode.SUBTRACT)
        extrude(f21_sk.sketch, amount=F21_DEPTH_BACK, mode=Mode.SUBTRACT)

    # F8 (on face) → F22 (cut, two sides)
    with BuildSketch(Plane(origin=(2.5, 0, 0), x_dir=(0, -1, 0), z_dir=(-1, 0, 0))) as f22_sk:
        with BuildLine():
            ThreePointArc((15.3205080757, 4), (16.7347216381, 3.4142135624), (17.3205080757, 2))
            Line((17.3205080757, 2), (17.3205080757, 4))
            Line((17.3205080757, 4), (15.3205080757, 4))
        make_face()
        with BuildLine():
            Line((15.3205080757, 0), (17.3205080757, 0))
            Line((17.3205080757, 0), (17.3205080757, 2))
            ThreePointArc((17.3205080757, 2), (16.7347216381, 0.5857864376), (15.3205080757, 0))
        make_face()
    extrude(amount=-F22_DEPTH, mode=Mode.SUBTRACT)
    extrude(f22_sk.sketch, amount=F22_DEPTH_BACK, mode=Mode.SUBTRACT)

    add(f1.part.fix(), mode=Mode.REPLACE)

    # F4 (on face) → F23 (cut, two sides)
    with BuildSketch(Plane(origin=(-1.25, 2.1650635095, 0), x_dir=(0.8660254038, 0.5, 0), z_dir=(0.5, -0.8660254038, 0))) as f23_sk:
        with BuildLine():
            ThreePointArc((15.3205080757, 4), (16.7347216381, 3.4142135624), (17.3205080757, 2))
            Line((17.3205080757, 2), (17.3205080757, 4))
            Line((17.3205080757, 4), (15.3205080757, 4))
        make_face()
        with BuildLine():
            Line((16.3205080757, 0), (17.3205080757, 0))
            Line((17.3205080757, 0), (17.3205080757, 2))
            ThreePointArc((17.3205080757, 2), (16.7347216381, 0.5857864376), (15.3205080757, 0))
            Line((15.3205080757, 0), (16.3205080757, 0))
        make_face()
    extrude(amount=-F23_DEPTH, mode=Mode.SUBTRACT)
    extrude(f23_sk.sketch, amount=F23_DEPTH_BACK, mode=Mode.SUBTRACT)


solid = f1.part
